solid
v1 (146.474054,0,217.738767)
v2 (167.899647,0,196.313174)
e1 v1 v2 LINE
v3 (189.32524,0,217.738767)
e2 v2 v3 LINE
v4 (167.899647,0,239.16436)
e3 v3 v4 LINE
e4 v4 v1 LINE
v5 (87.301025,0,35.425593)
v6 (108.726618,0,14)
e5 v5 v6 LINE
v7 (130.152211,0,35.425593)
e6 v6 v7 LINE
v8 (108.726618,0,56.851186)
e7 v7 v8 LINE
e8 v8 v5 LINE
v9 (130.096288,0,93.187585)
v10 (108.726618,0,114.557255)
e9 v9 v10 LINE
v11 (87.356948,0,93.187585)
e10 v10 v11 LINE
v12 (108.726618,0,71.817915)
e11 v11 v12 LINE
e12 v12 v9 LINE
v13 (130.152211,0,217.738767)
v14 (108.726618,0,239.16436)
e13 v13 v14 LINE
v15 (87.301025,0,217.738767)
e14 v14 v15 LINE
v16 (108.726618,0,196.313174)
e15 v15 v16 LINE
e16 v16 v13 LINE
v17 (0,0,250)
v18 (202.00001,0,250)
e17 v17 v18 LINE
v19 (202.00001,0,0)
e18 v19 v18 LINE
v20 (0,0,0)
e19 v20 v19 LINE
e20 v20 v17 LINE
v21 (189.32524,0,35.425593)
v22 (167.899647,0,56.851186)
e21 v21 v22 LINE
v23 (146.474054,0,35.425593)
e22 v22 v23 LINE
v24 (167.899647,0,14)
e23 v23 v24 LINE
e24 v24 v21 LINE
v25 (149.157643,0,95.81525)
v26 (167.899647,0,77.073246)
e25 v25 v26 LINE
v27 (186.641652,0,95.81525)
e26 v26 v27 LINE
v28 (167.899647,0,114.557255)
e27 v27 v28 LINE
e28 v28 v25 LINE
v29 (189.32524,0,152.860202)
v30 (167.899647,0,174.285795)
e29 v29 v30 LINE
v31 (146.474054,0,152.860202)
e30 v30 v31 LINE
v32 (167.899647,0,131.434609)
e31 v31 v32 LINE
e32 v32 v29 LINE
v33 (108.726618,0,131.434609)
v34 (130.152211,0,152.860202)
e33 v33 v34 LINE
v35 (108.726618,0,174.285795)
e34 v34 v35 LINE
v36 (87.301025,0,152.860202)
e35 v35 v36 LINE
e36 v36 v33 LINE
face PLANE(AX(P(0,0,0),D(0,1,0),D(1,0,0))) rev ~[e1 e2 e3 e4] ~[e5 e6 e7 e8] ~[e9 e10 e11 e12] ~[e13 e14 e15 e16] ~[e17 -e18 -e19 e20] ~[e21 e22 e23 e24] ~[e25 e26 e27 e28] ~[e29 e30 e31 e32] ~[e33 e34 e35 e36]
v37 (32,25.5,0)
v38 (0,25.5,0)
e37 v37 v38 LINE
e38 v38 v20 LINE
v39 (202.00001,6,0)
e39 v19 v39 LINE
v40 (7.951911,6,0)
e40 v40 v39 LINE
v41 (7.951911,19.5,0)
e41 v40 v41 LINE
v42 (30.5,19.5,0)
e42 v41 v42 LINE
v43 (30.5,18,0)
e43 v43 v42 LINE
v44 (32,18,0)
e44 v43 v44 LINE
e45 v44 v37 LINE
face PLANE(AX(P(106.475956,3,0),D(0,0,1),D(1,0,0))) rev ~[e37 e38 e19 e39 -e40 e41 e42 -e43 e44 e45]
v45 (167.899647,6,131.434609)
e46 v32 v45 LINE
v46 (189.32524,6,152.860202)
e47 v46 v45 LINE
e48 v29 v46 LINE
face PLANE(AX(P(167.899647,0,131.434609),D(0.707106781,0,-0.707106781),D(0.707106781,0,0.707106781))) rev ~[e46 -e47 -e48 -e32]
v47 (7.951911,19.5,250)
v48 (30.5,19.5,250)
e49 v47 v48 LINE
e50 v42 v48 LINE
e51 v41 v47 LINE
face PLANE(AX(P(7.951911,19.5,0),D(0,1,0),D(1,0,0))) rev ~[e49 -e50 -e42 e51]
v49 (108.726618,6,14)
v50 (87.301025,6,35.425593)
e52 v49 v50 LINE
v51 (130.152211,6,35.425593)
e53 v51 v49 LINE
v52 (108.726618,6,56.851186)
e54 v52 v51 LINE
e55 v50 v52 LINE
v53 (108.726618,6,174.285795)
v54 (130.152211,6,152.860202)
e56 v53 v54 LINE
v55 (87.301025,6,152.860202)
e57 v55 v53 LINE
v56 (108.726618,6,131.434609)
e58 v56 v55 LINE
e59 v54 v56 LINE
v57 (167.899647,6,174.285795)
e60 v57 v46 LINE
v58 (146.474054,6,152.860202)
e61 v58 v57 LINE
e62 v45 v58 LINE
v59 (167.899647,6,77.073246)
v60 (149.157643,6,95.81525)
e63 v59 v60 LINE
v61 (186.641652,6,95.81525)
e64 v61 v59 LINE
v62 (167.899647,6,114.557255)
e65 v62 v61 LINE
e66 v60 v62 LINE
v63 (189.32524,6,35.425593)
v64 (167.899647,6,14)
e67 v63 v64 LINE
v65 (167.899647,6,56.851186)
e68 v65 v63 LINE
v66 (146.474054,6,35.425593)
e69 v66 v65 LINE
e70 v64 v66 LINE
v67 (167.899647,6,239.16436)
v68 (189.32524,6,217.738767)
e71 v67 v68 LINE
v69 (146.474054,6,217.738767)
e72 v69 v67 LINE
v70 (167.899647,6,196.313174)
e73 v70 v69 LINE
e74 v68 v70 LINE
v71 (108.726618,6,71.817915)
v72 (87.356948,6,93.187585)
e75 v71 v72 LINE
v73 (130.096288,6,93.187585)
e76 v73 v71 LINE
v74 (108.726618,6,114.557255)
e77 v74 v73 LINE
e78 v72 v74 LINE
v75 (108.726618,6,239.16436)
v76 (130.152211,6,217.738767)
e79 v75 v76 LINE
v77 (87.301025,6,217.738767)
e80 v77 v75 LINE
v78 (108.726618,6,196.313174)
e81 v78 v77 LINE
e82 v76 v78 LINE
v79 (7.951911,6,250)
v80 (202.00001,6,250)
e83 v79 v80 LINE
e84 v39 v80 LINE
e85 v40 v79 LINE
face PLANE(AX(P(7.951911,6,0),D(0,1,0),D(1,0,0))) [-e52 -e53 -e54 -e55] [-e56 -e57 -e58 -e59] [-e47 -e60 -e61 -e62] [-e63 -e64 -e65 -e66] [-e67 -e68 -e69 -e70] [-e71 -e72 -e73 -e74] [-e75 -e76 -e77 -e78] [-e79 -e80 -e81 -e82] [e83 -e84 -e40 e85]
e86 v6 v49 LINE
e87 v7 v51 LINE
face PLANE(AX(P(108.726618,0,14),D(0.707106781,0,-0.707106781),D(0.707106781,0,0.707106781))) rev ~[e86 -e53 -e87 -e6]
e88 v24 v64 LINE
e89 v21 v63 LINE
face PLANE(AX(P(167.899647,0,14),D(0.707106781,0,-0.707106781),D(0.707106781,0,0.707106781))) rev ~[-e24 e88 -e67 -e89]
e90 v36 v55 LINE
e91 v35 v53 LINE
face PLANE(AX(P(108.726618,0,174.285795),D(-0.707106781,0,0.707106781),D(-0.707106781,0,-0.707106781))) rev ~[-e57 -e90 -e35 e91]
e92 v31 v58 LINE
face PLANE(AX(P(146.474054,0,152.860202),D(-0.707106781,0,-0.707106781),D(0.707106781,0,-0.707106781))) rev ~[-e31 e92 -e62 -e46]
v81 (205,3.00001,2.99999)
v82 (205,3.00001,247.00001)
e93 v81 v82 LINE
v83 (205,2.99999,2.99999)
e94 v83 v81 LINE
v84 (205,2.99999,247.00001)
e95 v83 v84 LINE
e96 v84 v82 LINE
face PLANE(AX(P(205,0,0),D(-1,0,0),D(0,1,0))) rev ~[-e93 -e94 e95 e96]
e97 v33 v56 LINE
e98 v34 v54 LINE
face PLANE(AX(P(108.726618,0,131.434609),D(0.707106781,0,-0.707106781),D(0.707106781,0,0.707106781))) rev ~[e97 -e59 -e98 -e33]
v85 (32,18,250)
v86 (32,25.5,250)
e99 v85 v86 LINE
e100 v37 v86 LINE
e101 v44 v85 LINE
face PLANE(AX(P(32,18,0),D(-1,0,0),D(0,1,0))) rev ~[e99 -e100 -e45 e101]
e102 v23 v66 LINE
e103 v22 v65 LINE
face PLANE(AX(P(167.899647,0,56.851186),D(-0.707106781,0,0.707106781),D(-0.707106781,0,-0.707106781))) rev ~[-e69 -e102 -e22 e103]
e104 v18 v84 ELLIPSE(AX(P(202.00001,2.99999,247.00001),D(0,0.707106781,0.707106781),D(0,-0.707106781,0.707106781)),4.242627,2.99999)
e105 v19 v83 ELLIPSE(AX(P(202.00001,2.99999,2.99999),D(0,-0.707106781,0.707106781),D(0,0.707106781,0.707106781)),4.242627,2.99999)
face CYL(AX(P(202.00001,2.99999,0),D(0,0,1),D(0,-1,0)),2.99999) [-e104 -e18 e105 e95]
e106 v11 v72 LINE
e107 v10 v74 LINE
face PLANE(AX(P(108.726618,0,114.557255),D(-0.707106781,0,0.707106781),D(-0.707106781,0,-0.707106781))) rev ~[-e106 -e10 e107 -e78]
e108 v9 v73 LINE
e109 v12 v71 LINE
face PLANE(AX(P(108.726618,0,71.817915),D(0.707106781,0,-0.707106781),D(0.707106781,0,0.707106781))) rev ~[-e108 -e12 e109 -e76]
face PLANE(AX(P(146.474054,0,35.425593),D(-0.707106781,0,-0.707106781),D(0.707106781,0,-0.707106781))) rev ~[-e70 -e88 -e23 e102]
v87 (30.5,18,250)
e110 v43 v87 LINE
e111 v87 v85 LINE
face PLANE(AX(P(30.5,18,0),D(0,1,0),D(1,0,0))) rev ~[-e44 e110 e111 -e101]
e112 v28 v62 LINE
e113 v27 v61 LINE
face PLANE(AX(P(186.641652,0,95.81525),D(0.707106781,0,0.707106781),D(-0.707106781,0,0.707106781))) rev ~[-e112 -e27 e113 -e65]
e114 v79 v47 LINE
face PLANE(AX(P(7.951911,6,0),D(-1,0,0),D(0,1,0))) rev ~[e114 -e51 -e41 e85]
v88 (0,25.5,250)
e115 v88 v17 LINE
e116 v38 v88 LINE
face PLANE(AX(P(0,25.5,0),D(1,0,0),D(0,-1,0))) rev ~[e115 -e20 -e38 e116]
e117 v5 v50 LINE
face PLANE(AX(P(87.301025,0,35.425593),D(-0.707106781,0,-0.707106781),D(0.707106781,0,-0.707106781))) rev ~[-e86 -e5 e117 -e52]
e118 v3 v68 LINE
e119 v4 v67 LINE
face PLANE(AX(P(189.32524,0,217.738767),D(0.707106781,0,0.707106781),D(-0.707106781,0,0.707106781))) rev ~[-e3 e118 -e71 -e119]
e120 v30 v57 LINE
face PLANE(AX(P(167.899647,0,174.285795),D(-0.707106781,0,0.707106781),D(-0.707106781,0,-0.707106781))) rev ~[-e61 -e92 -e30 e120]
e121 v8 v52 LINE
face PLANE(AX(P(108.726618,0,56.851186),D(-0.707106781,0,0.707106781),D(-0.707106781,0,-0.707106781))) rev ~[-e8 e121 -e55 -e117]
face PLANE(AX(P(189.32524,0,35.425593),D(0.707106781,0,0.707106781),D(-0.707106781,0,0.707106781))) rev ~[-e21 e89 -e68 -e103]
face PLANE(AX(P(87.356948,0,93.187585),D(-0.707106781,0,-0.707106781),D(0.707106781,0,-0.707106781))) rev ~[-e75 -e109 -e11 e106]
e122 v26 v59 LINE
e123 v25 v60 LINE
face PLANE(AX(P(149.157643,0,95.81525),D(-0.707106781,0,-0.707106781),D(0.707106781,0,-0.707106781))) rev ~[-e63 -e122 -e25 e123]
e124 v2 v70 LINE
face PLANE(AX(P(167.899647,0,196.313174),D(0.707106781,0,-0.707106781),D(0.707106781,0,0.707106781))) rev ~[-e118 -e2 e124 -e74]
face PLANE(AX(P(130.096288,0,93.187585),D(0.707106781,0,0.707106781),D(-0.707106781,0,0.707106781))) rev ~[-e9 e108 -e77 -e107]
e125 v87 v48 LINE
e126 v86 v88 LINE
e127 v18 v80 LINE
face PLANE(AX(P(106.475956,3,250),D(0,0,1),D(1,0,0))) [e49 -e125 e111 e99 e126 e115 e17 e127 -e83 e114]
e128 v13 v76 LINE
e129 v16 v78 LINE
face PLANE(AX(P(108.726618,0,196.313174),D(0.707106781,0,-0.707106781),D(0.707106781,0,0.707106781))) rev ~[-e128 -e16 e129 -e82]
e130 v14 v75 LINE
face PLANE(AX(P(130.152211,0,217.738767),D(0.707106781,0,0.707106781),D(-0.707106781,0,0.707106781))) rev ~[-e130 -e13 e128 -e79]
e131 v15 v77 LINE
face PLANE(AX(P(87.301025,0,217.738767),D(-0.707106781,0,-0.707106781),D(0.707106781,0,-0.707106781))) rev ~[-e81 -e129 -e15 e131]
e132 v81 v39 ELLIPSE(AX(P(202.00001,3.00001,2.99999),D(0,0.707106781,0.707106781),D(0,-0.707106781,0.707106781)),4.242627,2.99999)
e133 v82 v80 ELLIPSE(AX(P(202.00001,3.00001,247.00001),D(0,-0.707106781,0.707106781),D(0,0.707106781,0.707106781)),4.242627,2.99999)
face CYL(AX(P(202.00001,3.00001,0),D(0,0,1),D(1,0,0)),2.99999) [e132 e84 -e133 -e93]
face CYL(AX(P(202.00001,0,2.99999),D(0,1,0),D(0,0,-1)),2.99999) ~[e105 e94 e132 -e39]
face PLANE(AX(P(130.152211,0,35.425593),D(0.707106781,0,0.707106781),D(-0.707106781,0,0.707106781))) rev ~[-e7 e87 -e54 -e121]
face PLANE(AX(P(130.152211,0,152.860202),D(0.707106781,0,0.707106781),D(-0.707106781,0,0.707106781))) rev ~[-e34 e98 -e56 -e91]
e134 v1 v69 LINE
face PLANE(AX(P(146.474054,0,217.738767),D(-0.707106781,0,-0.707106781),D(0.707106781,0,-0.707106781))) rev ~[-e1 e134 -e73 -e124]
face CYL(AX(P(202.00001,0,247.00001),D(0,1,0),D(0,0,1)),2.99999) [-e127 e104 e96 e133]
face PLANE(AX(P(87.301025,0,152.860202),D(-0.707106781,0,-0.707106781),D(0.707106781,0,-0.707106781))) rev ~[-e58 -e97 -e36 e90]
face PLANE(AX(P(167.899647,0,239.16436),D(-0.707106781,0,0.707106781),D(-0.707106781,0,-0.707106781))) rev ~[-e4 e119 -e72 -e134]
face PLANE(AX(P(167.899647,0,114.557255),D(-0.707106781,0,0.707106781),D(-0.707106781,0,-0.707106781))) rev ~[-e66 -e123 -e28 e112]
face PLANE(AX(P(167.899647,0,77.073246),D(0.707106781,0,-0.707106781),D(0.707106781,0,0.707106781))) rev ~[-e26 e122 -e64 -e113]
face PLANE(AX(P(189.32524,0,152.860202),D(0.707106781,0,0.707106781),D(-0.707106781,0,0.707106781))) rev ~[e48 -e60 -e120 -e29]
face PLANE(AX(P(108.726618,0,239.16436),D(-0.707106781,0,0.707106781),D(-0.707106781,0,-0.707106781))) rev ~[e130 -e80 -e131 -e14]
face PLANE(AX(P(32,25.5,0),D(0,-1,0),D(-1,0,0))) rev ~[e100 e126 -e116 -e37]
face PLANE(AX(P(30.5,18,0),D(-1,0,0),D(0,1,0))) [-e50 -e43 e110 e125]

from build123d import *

# Parameters (mm, degrees)
F0_W     = 197.0480888034
F0_H     = 6
F0_W_2   = 7.9519111966
F0_H_2   = 13.5
F0_W_3   = 1.5
F0_H_3   = 1.5
F1_DEPTH = 250
F3_DEPTH = 25
F4_R     = 2.99999


# Not quite as in the source:
# - a fillet or chamfer is up to 0.001 mm smaller than in the source, because OpenCascade refuses the exact size


with BuildPart() as f1:
    # F0 (on Top) → F1 (new body)
    with BuildSketch(Plane.XY):
        with Locations((106.4759555983, 3)):
            Rectangle(F0_W, F0_H)
        with Locations((3.9759555983, 12.75)):
            Rectangle(F0_W_2, F0_H_2)
        with Locations((3.9759555983, 3)):
            Rectangle(F0_W_2, F0_H)
        with Locations((3.9759555983, 22.5)):
            Rectangle(F0_W_2, F0_H)
        Polygon((7.9519111966, 25.5), (7.9519111966, 19.5), (30.5, 19.5), (32, 19.5), (32, 25.5), align=None)
        with Locations((31.25, 18.75)):
            Rectangle(F0_W_3, F0_H_3)
    extrude(amount=F1_DEPTH)

    # F2 (on face) → F3 (cut)
    with BuildSketch(Plane.XZ):
        Polygon((87.3010246393, 35.425593216), (108.7266178553, 14), (130.1522110713, 35.425593216), (108.7266178553, 56.851186432), align=None)
        Polygon((146.474054042, 35.425593216), (167.8996472581, 14), (189.3252404741, 35.425593216), (167.8996472581, 56.851186432), align=None)
        Polygon((149.1576427927, 95.8152501475), (167.8996472581, 77.0732456821), (186.6416517235, 95.8152501475), (167.8996472581, 114.5572546129), align=None)
        Polygon((87.3569478805, 93.1875846381), (108.7266178553, 71.8179146634), (130.09628783, 93.1875846381), (108.7266178553, 114.5572546129), align=None)
        Polygon((87.3010246393, 152.8602018807), (108.7266178553, 131.4346086647), (130.1522110713, 152.8602018807), (108.7266178553, 174.2857950967), align=None)
        Polygon((146.474054042, 152.8602018807), (167.8996472581, 131.4346086647), (189.3252404741, 152.8602018807), (167.8996472581, 174.2857950967), align=None)
        Polygon((146.474054042, 217.7387669785), (167.8996472581, 196.3131737625), (189.3252404741, 217.7387669785), (167.8996472581, 239.1643601945), align=None)
        Polygon((87.3010246393, 217.7387669785), (108.7266178553, 196.3131737625), (130.1522110713, 217.7387669785), (108.7266178553, 239.1643601945), align=None)
    extrude(amount=-F3_DEPTH, mode=Mode.SUBTRACT)

    # F4 (radius 3 in the source; OpenCascade refuses exactly that, so slightly less here)
    f4_edges = [f1.edges().sort_by_distance(p)[0] for p in [
        (205, 0, 125),
        (205, 6, 125),
        (205, 3, 0),
        (205, 3, 250),
    ]]
    fillet(f4_edges, radius=F4_R)


solid = f1.part
